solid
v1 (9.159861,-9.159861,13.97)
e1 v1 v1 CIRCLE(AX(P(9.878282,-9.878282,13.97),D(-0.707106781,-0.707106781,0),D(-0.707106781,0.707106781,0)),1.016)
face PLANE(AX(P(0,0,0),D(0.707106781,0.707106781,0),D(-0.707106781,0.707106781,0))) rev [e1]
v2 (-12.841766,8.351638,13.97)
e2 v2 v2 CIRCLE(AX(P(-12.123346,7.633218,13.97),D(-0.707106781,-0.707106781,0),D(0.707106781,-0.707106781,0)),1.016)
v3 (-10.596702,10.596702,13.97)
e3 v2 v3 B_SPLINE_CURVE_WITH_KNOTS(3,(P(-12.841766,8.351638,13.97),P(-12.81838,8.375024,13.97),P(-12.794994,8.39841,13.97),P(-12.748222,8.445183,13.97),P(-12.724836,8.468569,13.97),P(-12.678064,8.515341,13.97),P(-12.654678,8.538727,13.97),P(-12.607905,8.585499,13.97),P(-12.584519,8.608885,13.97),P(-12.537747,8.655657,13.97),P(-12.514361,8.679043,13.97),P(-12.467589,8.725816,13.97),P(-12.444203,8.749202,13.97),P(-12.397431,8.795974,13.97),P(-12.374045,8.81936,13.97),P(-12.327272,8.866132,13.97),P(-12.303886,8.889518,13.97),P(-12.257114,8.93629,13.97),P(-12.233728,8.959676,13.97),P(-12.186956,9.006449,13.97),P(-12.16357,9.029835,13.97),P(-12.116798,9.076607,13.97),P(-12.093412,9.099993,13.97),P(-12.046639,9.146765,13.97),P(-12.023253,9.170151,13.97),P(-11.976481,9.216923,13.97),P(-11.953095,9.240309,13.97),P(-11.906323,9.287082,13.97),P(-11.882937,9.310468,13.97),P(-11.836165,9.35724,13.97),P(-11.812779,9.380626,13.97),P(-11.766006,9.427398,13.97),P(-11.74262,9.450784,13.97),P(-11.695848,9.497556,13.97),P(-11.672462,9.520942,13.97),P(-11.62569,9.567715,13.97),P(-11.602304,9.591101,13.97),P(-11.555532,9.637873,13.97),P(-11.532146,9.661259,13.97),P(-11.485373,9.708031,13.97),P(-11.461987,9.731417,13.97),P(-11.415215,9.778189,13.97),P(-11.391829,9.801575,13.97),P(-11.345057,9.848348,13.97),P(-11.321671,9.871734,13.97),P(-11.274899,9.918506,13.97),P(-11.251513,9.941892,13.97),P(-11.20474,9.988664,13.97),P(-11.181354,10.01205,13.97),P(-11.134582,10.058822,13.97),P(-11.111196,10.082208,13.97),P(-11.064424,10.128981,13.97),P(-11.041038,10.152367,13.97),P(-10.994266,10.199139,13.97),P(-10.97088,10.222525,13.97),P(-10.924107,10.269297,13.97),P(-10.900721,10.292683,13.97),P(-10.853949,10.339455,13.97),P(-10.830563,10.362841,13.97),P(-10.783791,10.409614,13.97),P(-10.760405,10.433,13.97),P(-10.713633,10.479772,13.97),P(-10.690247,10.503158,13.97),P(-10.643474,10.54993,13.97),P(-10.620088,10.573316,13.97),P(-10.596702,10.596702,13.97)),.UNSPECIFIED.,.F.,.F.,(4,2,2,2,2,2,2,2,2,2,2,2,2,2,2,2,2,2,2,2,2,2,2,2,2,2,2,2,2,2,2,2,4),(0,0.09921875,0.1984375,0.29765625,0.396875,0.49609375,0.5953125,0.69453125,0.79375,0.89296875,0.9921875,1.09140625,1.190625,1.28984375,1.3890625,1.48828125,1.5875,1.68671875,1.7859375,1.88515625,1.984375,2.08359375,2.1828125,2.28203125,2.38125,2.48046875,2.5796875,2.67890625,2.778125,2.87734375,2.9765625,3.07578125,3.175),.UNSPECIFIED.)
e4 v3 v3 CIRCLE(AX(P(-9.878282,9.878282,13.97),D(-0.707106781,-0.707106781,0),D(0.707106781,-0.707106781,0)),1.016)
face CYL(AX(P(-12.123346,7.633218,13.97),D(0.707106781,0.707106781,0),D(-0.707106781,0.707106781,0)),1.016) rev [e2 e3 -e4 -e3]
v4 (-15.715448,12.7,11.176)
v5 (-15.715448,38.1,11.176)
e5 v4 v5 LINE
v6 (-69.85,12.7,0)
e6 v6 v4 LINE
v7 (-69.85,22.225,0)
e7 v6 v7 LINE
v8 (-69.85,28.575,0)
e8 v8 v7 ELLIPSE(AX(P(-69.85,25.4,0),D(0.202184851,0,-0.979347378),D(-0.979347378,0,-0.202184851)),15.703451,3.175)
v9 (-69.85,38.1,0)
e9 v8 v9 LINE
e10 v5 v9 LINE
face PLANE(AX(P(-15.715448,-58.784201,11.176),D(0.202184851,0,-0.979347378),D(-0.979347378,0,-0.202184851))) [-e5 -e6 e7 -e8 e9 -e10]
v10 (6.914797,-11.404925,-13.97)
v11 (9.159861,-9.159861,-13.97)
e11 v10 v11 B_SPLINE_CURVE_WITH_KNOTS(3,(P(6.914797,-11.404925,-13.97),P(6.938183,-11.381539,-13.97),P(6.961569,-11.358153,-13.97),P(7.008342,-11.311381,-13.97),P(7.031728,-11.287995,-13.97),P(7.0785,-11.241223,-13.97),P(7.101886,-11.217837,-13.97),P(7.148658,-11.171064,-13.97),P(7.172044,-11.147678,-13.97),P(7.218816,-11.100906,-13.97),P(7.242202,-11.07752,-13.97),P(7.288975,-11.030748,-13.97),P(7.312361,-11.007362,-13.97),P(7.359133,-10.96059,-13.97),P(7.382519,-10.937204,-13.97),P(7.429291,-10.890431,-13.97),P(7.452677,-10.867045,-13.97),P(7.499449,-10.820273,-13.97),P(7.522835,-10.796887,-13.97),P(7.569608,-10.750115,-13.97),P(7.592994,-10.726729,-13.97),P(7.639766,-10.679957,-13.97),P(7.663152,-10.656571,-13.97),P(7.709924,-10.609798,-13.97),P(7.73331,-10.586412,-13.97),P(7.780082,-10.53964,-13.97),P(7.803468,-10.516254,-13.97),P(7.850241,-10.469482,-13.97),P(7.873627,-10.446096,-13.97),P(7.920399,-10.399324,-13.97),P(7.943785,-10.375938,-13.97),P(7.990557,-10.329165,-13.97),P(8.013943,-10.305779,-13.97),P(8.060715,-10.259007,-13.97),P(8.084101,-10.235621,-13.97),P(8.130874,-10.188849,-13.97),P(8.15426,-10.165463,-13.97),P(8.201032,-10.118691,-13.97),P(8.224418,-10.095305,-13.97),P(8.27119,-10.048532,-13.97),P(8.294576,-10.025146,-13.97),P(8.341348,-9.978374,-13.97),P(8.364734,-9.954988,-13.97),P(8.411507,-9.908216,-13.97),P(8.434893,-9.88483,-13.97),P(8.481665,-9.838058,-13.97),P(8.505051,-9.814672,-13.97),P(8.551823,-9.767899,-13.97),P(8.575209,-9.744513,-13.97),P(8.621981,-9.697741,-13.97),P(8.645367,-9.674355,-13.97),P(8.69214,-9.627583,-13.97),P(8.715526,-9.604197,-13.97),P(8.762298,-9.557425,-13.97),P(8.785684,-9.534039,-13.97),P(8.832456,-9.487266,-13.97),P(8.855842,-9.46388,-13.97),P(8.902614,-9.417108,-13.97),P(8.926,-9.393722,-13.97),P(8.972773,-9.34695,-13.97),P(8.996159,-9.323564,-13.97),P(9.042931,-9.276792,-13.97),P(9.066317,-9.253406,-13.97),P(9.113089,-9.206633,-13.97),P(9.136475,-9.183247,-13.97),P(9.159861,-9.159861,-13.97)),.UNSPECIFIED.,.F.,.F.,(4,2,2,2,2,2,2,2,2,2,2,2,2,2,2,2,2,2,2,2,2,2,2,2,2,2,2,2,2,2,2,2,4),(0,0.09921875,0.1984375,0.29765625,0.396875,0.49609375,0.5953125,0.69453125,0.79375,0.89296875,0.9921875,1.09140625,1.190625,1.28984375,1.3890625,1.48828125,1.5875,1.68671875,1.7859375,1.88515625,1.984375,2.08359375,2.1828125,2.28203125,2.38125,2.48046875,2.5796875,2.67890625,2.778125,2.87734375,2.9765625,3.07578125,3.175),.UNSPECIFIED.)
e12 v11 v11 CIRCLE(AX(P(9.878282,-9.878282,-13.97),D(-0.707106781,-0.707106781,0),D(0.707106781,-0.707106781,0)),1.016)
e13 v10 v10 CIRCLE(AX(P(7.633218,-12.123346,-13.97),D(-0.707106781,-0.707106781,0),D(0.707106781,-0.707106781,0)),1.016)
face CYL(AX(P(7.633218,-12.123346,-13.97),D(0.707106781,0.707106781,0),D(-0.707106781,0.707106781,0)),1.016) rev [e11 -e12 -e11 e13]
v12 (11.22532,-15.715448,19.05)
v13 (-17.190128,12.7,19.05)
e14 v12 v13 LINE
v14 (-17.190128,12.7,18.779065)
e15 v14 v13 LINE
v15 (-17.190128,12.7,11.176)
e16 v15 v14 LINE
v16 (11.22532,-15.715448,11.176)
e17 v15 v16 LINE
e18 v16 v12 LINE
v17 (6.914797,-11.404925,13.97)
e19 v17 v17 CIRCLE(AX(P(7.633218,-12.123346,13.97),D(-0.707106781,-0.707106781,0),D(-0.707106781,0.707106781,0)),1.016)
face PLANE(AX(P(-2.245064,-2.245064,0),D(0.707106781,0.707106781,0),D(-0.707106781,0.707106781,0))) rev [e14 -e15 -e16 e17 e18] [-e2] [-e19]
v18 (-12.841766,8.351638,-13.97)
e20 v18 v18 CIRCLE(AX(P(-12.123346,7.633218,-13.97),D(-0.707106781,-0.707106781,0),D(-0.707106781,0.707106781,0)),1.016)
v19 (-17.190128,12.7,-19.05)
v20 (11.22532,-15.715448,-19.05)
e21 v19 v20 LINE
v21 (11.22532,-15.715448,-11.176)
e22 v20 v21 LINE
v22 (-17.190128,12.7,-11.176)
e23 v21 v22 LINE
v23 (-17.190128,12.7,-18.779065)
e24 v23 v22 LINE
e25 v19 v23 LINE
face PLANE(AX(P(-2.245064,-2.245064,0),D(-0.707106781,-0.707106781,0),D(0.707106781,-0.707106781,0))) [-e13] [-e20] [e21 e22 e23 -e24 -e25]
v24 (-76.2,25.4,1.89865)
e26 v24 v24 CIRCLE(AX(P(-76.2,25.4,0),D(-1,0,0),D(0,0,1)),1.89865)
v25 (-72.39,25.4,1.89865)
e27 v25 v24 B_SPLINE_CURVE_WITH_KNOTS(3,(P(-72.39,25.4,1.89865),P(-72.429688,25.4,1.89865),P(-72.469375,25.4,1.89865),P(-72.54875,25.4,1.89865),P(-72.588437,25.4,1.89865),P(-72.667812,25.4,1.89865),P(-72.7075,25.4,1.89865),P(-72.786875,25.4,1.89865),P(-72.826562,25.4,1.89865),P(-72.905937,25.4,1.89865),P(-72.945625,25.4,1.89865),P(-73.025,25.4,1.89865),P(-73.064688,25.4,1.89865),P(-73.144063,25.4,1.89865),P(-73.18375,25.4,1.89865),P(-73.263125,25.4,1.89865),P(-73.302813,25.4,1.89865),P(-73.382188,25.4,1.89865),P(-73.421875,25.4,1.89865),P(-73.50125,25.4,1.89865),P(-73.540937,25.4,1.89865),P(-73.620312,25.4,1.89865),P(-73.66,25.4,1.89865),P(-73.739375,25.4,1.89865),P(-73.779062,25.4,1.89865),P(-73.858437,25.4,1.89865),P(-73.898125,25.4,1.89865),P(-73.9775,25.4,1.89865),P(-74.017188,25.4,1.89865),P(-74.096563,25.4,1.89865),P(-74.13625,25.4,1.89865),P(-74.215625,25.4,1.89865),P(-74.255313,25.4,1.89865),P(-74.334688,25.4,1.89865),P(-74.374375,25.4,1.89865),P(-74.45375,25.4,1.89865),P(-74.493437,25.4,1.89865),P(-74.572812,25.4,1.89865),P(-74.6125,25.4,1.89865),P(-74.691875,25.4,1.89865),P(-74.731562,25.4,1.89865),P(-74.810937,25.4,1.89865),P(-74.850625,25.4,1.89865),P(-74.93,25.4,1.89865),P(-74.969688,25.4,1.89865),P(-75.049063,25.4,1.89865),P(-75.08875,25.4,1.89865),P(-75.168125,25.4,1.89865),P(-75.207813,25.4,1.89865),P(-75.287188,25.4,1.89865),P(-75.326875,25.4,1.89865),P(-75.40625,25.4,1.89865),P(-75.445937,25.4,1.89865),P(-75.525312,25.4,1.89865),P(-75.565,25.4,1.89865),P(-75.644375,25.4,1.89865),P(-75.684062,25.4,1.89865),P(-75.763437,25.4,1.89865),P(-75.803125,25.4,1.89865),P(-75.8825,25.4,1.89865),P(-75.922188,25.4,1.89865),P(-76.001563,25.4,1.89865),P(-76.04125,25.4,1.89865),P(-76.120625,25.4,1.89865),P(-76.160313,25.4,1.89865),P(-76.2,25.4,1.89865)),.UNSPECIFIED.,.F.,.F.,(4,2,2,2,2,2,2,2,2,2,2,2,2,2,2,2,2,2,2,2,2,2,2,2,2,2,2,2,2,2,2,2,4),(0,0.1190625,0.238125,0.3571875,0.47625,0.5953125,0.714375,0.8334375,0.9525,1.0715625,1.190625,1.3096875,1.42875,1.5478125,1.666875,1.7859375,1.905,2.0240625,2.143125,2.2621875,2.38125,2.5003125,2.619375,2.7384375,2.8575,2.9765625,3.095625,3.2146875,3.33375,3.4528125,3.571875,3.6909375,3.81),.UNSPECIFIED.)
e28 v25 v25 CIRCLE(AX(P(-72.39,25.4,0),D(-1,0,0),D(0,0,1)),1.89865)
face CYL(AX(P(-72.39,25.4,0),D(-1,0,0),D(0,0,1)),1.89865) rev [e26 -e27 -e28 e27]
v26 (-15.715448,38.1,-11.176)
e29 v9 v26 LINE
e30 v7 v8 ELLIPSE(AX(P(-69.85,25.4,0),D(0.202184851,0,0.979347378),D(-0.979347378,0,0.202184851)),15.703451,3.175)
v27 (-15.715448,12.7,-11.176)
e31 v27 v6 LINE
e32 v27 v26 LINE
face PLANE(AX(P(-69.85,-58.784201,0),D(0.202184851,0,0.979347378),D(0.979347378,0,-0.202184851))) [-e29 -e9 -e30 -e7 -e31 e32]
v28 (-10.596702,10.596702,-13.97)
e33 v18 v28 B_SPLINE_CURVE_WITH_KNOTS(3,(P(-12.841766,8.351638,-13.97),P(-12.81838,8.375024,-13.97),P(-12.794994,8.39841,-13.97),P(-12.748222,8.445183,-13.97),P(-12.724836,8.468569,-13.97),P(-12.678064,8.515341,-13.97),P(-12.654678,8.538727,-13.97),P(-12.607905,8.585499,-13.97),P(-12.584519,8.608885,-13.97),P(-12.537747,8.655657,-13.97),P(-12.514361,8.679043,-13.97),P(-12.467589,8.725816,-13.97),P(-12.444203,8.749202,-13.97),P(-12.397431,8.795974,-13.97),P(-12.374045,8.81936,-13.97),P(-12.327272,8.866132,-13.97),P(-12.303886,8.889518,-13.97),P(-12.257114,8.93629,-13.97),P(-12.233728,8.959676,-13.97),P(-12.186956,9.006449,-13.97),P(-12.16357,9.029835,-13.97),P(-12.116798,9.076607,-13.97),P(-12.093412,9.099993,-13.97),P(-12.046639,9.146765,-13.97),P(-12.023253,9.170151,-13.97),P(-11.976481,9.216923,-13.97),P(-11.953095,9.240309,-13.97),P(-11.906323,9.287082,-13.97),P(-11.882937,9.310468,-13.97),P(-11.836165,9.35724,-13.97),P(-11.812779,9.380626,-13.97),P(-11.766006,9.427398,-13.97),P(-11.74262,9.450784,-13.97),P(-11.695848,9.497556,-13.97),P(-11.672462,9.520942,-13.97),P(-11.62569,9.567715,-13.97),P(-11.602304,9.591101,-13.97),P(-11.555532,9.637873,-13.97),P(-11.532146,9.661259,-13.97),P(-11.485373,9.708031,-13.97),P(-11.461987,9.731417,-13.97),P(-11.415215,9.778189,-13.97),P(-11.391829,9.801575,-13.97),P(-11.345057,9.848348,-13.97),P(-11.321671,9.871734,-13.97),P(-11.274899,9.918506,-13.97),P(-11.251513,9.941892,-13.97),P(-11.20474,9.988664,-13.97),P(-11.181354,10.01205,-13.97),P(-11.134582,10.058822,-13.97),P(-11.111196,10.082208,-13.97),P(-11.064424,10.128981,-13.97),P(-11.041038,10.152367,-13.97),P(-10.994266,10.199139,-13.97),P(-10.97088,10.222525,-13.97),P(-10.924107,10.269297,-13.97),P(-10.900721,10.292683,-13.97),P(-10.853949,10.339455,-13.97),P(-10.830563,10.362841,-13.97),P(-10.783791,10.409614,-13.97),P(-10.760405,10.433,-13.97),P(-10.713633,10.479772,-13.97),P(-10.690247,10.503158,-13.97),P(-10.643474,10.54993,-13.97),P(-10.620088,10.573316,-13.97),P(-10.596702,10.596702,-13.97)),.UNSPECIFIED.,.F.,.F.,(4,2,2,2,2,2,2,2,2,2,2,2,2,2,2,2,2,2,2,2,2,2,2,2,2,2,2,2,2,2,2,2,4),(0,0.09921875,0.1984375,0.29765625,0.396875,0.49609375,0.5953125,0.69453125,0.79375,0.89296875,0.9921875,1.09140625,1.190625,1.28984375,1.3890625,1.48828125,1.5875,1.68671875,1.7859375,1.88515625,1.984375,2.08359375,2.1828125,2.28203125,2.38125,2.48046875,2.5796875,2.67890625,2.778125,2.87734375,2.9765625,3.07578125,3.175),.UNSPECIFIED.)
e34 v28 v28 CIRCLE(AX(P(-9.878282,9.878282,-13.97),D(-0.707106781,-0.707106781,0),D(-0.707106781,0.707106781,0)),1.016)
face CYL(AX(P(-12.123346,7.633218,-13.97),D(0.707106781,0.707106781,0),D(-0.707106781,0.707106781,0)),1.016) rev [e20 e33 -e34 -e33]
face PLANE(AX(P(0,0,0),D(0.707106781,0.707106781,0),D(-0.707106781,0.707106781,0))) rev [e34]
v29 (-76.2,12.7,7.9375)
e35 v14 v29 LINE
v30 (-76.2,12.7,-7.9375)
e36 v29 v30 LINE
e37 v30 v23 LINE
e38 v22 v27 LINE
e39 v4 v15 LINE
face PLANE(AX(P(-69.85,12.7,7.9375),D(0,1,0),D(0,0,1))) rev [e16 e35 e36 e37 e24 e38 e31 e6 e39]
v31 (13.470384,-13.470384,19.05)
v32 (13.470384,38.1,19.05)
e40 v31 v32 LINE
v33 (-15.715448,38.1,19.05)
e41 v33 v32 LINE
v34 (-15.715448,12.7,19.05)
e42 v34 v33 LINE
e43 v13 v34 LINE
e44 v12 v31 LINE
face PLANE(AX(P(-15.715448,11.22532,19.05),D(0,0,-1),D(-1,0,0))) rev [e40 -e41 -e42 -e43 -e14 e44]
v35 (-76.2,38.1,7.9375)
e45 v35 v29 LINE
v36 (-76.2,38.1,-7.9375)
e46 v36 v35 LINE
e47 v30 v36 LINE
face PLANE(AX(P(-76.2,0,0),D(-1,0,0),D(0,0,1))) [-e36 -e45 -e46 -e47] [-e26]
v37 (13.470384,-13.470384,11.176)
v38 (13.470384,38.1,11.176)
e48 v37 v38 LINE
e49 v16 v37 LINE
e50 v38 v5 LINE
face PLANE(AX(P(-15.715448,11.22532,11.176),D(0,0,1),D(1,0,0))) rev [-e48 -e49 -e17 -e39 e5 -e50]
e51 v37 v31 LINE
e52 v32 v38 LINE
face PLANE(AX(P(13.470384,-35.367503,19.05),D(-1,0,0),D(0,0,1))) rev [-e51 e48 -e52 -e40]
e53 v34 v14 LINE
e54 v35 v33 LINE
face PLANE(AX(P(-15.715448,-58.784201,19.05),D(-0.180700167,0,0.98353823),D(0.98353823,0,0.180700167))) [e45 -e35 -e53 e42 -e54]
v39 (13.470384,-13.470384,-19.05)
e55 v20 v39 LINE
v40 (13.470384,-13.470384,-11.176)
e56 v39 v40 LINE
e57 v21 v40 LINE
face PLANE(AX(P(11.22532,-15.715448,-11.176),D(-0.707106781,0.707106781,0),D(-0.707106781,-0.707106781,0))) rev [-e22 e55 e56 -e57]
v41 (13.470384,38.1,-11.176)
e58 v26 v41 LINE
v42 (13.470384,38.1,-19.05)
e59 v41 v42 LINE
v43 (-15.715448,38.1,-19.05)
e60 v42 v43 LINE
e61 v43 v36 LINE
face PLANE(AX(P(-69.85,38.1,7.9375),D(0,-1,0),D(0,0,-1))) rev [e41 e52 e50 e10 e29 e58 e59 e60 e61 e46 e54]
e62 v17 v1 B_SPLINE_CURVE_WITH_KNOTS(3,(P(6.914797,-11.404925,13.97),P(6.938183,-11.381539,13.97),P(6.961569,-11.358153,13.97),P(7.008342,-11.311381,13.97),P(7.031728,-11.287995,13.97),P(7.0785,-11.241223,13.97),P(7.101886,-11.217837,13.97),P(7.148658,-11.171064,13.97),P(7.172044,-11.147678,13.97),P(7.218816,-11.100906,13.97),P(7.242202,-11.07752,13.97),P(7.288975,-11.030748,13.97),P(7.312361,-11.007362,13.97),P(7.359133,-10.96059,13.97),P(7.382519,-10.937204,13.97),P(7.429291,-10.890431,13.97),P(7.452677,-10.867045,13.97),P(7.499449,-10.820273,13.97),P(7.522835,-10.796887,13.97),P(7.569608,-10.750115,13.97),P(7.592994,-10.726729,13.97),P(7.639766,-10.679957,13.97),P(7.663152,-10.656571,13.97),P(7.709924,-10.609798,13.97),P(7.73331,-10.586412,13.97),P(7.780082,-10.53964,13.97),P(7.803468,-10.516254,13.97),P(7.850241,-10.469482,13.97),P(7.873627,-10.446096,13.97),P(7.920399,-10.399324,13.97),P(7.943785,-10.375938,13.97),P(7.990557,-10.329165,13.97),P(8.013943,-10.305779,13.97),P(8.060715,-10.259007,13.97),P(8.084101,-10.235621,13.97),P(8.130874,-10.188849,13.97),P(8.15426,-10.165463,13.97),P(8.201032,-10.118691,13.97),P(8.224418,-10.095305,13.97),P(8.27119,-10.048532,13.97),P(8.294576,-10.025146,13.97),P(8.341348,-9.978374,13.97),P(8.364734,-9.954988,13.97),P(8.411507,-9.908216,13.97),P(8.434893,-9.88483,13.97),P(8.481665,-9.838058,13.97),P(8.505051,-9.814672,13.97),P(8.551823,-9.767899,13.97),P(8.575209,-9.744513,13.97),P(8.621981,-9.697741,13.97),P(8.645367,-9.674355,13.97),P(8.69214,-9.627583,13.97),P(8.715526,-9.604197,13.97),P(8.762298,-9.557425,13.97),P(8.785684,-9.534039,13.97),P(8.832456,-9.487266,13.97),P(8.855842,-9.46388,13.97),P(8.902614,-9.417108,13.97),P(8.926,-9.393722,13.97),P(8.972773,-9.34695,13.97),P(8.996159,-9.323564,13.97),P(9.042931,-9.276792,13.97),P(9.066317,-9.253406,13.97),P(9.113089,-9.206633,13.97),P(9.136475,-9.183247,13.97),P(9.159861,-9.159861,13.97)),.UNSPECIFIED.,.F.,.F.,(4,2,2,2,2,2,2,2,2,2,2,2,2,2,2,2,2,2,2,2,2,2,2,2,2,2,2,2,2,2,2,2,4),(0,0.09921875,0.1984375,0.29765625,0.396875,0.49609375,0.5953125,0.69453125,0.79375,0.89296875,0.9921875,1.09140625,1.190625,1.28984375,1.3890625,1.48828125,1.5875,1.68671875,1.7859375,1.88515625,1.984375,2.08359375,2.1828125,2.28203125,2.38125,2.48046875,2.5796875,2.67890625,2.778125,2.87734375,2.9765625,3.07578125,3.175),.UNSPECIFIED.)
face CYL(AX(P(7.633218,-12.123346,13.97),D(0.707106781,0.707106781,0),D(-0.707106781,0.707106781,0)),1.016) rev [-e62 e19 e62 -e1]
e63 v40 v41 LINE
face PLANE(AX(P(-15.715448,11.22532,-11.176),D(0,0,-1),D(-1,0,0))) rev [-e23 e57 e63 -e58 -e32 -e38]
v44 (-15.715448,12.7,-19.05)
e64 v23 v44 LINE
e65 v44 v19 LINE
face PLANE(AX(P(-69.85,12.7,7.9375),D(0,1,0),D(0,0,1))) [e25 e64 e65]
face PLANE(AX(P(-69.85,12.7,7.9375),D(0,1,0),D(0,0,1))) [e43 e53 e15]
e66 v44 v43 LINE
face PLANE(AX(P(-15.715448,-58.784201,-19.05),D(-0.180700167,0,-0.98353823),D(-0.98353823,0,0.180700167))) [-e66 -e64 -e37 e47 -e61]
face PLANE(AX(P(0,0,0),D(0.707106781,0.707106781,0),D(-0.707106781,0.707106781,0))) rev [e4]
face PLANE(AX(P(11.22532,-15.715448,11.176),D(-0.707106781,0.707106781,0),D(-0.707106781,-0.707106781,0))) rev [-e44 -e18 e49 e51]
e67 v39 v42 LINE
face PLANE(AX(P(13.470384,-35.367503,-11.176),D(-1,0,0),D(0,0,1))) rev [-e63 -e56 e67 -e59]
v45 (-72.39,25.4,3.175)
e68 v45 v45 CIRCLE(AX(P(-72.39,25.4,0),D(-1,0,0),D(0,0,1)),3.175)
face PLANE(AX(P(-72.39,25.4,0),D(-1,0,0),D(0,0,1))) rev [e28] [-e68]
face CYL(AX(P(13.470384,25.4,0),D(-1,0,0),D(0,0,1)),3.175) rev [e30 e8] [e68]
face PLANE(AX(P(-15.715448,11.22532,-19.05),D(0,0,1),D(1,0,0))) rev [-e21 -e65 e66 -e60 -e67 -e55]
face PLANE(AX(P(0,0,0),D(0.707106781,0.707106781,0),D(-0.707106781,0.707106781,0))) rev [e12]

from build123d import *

# Parameters (mm, degrees)
BOSS_EXTRUDE2_START   = -76.2
SKETCH3_W             = 15.875
SKETCH3_H             = 25.4
BOSS_EXTRUDE2_DEPTH   = 6.35
SKETCH4_W             = 38.1
SKETCH4_H             = 7.874
SKETCH4_R             = 1.016
BOSS_EXTRUDE3_DEPTH   = 3.175
BOSS_EXTRUDE3_2_DEPTH = 3.175
BOSS_EXTRUDE4_REACH   = 85.527
BOSS_EXTRUDE5_DEPTH   = 25.4
BOSS_EXTRUDE7_DEPTH   = 25.4
BOSS_EXTRUDE8_START   = -19.05
BOSS_EXTRUDE8_DEPTH   = 7.874
BOSS_EXTRUDE8_START_2 = 11.176
BOSS_EXTRUDE8_2_DEPTH = 7.874
SKETCH9_R             = 1.89865
CUT_EXTRUDE2_DEPTH    = 3.81
SKETCH10_R            = 3.175
CUT_EXTRUDE3_DEPTH    = 96.846325291


with BuildPart() as part:
    # Sketch3 → Boss-Extrude2 (new body)
    with BuildSketch(Plane(origin=(0, 0, 0), x_dir=(0, 0, -1), z_dir=(1, 0, 0)).offset(BOSS_EXTRUDE2_START)):
        with Locations((0, 25.4)):
            Rectangle(SKETCH3_W, SKETCH3_H)
    extrude(amount=BOSS_EXTRUDE2_DEPTH)



with BuildPart() as body_2:
    # Sketch4 → Boss-Extrude3 (new body)
    with BuildSketch(Plane(origin=(0, 0, 0), x_dir=(-0.7071067811865477, 0.7071067811865475, 0), z_dir=(-0.7071067811865475, -0.7071067811865477, 0))):
        with Locations((0, -15.113)):
            Rectangle(SKETCH4_W, SKETCH4_H)
        with Locations((13.97, -13.97)):
            Circle(SKETCH4_R, mode=Mode.SUBTRACT)
        with Locations((-13.97, -13.97)):
            Circle(SKETCH4_R, mode=Mode.SUBTRACT)
    extrude(amount=BOSS_EXTRUDE3_DEPTH)

    # Boss-Extrude4: up to this face of the body (flat: up to its plane)
    boss_extrude4_end = Plane(body_2.part.faces().sort_by_distance((0, 0, 15.13825721))[0])
    # Sketch6 → Boss-Extrude4 (add, up to the picked face)
    with BuildSketch(Plane.XZ.offset(-12.7), mode=Mode.PRIVATE) as boss_extrude4_sk1:
        Polygon((-13.470384182, -19.05), (-15.715448212, -19.05), (-15.715448212, -11.176), (-13.470384182, -11.176), (13.470384182, -11.176), (13.470384182, -19.05), align=None)
    boss_extrude4_tool1 = split(extrude(boss_extrude4_sk1.sketch, amount=BOSS_EXTRUDE4_REACH, mode=Mode.PRIVATE), bisect_by=boss_extrude4_end, keep=Keep.BOTH, mode=Mode.PRIVATE)
    # Sketch6 → Boss-Extrude4 (add, up to the picked face)
    with BuildSketch(Plane.XZ.offset(-12.7), mode=Mode.PRIVATE) as boss_extrude4_sk2:
        Polygon((-13.470384182, 11.176), (-15.715448212, 11.176), (-15.715448212, 19.05), (-13.470384182, 19.05), (13.470384182, 19.05), (13.470384182, 11.176), align=None)
    boss_extrude4_tool2 = split(extrude(boss_extrude4_sk2.sketch, amount=BOSS_EXTRUDE4_REACH, mode=Mode.PRIVATE), bisect_by=boss_extrude4_end, keep=Keep.BOTH, mode=Mode.PRIVATE)


with BuildPart() as body_3:
    # Sketch4 → Boss-Extrude3 2 (new body)
    with BuildSketch(Plane(origin=(0, 0, 0), x_dir=(-0.7071067811865477, 0.7071067811865475, 0), z_dir=(-0.7071067811865475, -0.7071067811865477, 0))):
        with Locations((0, 15.113)):
            Rectangle(SKETCH4_W, SKETCH4_H)
        with Locations((13.97, 13.97)):
            Circle(SKETCH4_R, mode=Mode.SUBTRACT)
        with Locations((-13.97, 13.97)):
            Circle(SKETCH4_R, mode=Mode.SUBTRACT)
    extrude(amount=BOSS_EXTRUDE3_2_DEPTH)


with BuildPart() as body_2_1:
    add(body_2.part)

    add(body_3.part)  # Boss-Extrude4 merges body 3
    add(boss_extrude4_tool1.solids().sort_by(Axis((-1.122532, 12.7, -15.113), (0, -1, 0)))[0])
    add(boss_extrude4_tool2.solids().sort_by(Axis((-1.122532, 12.7, 15.113), (0, -1, 0)))[0])

    # Sketch6<2> → Boss-Extrude5 (add)
    with BuildSketch(Plane.XZ.offset(-12.7)):
        Polygon((-13.470384182, -19.05), (-15.715448212, -19.05), (-15.715448212, -11.176), (-13.470384182, -11.176), (13.470384182, -11.176), (13.470384182, -19.05), align=None)
        Polygon((-13.470384182, 11.176), (-15.715448212, 11.176), (-15.715448212, 19.05), (-13.470384182, 19.05), (13.470384182, 19.05), (13.470384182, 11.176), align=None)
    extrude(amount=-BOSS_EXTRUDE5_DEPTH)


with BuildPart() as part_1:
    add(part.part)

    add(body_2_1.part)  # Boss-Extrude7 merges body 2
    # Sketch7 → Boss-Extrude7 (add)
    with BuildSketch(Plane(origin=(0, 38.1, 0), x_dir=(1, 0, 0), z_dir=(0, 1, 0))):
        Polygon((-15.715448212, 19.05), (-76.2, 7.9375), (-76.2, -7.9375), (-15.715448212, -19.05), (-15.715448212, -11.176), (-69.85, 0), (-15.715448212, 11.176), align=None)
    extrude(amount=-BOSS_EXTRUDE7_DEPTH)

    # Boss-Extrude8: read off the stored shape, not the designer's step
    # Boss-Extrude8 outline → Boss-Extrude8 (add)
    with BuildSketch(Plane.XY.offset(BOSS_EXTRUDE8_START)):
        Polygon((-14.240768363, 12.7), (-17.190128061, 12.7), (-15.715448212, 11.225320151), align=None)
    extrude(amount=BOSS_EXTRUDE8_DEPTH)

    # Boss-Extrude8 2 outline → Boss-Extrude8 2 (add)
    with BuildSketch(Plane.XY.offset(BOSS_EXTRUDE8_START_2)):
        Polygon((-14.240768363, 12.7), (-17.190128061, 12.7), (-15.715448212, 11.225320151), align=None)
    extrude(amount=BOSS_EXTRUDE8_2_DEPTH)

    # Sketch9 → Cut-Extrude2 (cut)
    with BuildSketch(Plane.ZY.offset(76.2)):
        with Locations((0, 25.4)):
            Circle(SKETCH9_R)
    extrude(amount=-CUT_EXTRUDE2_DEPTH, mode=Mode.SUBTRACT)

    # Sketch10 → Cut-Extrude3 (cut, through all)
    with BuildSketch(Plane.ZY.offset(72.39)):
        with Locations((0, 25.4)):
            Circle(SKETCH10_R)
    extrude(amount=-CUT_EXTRUDE3_DEPTH, mode=Mode.SUBTRACT)


solid = part_1.part
